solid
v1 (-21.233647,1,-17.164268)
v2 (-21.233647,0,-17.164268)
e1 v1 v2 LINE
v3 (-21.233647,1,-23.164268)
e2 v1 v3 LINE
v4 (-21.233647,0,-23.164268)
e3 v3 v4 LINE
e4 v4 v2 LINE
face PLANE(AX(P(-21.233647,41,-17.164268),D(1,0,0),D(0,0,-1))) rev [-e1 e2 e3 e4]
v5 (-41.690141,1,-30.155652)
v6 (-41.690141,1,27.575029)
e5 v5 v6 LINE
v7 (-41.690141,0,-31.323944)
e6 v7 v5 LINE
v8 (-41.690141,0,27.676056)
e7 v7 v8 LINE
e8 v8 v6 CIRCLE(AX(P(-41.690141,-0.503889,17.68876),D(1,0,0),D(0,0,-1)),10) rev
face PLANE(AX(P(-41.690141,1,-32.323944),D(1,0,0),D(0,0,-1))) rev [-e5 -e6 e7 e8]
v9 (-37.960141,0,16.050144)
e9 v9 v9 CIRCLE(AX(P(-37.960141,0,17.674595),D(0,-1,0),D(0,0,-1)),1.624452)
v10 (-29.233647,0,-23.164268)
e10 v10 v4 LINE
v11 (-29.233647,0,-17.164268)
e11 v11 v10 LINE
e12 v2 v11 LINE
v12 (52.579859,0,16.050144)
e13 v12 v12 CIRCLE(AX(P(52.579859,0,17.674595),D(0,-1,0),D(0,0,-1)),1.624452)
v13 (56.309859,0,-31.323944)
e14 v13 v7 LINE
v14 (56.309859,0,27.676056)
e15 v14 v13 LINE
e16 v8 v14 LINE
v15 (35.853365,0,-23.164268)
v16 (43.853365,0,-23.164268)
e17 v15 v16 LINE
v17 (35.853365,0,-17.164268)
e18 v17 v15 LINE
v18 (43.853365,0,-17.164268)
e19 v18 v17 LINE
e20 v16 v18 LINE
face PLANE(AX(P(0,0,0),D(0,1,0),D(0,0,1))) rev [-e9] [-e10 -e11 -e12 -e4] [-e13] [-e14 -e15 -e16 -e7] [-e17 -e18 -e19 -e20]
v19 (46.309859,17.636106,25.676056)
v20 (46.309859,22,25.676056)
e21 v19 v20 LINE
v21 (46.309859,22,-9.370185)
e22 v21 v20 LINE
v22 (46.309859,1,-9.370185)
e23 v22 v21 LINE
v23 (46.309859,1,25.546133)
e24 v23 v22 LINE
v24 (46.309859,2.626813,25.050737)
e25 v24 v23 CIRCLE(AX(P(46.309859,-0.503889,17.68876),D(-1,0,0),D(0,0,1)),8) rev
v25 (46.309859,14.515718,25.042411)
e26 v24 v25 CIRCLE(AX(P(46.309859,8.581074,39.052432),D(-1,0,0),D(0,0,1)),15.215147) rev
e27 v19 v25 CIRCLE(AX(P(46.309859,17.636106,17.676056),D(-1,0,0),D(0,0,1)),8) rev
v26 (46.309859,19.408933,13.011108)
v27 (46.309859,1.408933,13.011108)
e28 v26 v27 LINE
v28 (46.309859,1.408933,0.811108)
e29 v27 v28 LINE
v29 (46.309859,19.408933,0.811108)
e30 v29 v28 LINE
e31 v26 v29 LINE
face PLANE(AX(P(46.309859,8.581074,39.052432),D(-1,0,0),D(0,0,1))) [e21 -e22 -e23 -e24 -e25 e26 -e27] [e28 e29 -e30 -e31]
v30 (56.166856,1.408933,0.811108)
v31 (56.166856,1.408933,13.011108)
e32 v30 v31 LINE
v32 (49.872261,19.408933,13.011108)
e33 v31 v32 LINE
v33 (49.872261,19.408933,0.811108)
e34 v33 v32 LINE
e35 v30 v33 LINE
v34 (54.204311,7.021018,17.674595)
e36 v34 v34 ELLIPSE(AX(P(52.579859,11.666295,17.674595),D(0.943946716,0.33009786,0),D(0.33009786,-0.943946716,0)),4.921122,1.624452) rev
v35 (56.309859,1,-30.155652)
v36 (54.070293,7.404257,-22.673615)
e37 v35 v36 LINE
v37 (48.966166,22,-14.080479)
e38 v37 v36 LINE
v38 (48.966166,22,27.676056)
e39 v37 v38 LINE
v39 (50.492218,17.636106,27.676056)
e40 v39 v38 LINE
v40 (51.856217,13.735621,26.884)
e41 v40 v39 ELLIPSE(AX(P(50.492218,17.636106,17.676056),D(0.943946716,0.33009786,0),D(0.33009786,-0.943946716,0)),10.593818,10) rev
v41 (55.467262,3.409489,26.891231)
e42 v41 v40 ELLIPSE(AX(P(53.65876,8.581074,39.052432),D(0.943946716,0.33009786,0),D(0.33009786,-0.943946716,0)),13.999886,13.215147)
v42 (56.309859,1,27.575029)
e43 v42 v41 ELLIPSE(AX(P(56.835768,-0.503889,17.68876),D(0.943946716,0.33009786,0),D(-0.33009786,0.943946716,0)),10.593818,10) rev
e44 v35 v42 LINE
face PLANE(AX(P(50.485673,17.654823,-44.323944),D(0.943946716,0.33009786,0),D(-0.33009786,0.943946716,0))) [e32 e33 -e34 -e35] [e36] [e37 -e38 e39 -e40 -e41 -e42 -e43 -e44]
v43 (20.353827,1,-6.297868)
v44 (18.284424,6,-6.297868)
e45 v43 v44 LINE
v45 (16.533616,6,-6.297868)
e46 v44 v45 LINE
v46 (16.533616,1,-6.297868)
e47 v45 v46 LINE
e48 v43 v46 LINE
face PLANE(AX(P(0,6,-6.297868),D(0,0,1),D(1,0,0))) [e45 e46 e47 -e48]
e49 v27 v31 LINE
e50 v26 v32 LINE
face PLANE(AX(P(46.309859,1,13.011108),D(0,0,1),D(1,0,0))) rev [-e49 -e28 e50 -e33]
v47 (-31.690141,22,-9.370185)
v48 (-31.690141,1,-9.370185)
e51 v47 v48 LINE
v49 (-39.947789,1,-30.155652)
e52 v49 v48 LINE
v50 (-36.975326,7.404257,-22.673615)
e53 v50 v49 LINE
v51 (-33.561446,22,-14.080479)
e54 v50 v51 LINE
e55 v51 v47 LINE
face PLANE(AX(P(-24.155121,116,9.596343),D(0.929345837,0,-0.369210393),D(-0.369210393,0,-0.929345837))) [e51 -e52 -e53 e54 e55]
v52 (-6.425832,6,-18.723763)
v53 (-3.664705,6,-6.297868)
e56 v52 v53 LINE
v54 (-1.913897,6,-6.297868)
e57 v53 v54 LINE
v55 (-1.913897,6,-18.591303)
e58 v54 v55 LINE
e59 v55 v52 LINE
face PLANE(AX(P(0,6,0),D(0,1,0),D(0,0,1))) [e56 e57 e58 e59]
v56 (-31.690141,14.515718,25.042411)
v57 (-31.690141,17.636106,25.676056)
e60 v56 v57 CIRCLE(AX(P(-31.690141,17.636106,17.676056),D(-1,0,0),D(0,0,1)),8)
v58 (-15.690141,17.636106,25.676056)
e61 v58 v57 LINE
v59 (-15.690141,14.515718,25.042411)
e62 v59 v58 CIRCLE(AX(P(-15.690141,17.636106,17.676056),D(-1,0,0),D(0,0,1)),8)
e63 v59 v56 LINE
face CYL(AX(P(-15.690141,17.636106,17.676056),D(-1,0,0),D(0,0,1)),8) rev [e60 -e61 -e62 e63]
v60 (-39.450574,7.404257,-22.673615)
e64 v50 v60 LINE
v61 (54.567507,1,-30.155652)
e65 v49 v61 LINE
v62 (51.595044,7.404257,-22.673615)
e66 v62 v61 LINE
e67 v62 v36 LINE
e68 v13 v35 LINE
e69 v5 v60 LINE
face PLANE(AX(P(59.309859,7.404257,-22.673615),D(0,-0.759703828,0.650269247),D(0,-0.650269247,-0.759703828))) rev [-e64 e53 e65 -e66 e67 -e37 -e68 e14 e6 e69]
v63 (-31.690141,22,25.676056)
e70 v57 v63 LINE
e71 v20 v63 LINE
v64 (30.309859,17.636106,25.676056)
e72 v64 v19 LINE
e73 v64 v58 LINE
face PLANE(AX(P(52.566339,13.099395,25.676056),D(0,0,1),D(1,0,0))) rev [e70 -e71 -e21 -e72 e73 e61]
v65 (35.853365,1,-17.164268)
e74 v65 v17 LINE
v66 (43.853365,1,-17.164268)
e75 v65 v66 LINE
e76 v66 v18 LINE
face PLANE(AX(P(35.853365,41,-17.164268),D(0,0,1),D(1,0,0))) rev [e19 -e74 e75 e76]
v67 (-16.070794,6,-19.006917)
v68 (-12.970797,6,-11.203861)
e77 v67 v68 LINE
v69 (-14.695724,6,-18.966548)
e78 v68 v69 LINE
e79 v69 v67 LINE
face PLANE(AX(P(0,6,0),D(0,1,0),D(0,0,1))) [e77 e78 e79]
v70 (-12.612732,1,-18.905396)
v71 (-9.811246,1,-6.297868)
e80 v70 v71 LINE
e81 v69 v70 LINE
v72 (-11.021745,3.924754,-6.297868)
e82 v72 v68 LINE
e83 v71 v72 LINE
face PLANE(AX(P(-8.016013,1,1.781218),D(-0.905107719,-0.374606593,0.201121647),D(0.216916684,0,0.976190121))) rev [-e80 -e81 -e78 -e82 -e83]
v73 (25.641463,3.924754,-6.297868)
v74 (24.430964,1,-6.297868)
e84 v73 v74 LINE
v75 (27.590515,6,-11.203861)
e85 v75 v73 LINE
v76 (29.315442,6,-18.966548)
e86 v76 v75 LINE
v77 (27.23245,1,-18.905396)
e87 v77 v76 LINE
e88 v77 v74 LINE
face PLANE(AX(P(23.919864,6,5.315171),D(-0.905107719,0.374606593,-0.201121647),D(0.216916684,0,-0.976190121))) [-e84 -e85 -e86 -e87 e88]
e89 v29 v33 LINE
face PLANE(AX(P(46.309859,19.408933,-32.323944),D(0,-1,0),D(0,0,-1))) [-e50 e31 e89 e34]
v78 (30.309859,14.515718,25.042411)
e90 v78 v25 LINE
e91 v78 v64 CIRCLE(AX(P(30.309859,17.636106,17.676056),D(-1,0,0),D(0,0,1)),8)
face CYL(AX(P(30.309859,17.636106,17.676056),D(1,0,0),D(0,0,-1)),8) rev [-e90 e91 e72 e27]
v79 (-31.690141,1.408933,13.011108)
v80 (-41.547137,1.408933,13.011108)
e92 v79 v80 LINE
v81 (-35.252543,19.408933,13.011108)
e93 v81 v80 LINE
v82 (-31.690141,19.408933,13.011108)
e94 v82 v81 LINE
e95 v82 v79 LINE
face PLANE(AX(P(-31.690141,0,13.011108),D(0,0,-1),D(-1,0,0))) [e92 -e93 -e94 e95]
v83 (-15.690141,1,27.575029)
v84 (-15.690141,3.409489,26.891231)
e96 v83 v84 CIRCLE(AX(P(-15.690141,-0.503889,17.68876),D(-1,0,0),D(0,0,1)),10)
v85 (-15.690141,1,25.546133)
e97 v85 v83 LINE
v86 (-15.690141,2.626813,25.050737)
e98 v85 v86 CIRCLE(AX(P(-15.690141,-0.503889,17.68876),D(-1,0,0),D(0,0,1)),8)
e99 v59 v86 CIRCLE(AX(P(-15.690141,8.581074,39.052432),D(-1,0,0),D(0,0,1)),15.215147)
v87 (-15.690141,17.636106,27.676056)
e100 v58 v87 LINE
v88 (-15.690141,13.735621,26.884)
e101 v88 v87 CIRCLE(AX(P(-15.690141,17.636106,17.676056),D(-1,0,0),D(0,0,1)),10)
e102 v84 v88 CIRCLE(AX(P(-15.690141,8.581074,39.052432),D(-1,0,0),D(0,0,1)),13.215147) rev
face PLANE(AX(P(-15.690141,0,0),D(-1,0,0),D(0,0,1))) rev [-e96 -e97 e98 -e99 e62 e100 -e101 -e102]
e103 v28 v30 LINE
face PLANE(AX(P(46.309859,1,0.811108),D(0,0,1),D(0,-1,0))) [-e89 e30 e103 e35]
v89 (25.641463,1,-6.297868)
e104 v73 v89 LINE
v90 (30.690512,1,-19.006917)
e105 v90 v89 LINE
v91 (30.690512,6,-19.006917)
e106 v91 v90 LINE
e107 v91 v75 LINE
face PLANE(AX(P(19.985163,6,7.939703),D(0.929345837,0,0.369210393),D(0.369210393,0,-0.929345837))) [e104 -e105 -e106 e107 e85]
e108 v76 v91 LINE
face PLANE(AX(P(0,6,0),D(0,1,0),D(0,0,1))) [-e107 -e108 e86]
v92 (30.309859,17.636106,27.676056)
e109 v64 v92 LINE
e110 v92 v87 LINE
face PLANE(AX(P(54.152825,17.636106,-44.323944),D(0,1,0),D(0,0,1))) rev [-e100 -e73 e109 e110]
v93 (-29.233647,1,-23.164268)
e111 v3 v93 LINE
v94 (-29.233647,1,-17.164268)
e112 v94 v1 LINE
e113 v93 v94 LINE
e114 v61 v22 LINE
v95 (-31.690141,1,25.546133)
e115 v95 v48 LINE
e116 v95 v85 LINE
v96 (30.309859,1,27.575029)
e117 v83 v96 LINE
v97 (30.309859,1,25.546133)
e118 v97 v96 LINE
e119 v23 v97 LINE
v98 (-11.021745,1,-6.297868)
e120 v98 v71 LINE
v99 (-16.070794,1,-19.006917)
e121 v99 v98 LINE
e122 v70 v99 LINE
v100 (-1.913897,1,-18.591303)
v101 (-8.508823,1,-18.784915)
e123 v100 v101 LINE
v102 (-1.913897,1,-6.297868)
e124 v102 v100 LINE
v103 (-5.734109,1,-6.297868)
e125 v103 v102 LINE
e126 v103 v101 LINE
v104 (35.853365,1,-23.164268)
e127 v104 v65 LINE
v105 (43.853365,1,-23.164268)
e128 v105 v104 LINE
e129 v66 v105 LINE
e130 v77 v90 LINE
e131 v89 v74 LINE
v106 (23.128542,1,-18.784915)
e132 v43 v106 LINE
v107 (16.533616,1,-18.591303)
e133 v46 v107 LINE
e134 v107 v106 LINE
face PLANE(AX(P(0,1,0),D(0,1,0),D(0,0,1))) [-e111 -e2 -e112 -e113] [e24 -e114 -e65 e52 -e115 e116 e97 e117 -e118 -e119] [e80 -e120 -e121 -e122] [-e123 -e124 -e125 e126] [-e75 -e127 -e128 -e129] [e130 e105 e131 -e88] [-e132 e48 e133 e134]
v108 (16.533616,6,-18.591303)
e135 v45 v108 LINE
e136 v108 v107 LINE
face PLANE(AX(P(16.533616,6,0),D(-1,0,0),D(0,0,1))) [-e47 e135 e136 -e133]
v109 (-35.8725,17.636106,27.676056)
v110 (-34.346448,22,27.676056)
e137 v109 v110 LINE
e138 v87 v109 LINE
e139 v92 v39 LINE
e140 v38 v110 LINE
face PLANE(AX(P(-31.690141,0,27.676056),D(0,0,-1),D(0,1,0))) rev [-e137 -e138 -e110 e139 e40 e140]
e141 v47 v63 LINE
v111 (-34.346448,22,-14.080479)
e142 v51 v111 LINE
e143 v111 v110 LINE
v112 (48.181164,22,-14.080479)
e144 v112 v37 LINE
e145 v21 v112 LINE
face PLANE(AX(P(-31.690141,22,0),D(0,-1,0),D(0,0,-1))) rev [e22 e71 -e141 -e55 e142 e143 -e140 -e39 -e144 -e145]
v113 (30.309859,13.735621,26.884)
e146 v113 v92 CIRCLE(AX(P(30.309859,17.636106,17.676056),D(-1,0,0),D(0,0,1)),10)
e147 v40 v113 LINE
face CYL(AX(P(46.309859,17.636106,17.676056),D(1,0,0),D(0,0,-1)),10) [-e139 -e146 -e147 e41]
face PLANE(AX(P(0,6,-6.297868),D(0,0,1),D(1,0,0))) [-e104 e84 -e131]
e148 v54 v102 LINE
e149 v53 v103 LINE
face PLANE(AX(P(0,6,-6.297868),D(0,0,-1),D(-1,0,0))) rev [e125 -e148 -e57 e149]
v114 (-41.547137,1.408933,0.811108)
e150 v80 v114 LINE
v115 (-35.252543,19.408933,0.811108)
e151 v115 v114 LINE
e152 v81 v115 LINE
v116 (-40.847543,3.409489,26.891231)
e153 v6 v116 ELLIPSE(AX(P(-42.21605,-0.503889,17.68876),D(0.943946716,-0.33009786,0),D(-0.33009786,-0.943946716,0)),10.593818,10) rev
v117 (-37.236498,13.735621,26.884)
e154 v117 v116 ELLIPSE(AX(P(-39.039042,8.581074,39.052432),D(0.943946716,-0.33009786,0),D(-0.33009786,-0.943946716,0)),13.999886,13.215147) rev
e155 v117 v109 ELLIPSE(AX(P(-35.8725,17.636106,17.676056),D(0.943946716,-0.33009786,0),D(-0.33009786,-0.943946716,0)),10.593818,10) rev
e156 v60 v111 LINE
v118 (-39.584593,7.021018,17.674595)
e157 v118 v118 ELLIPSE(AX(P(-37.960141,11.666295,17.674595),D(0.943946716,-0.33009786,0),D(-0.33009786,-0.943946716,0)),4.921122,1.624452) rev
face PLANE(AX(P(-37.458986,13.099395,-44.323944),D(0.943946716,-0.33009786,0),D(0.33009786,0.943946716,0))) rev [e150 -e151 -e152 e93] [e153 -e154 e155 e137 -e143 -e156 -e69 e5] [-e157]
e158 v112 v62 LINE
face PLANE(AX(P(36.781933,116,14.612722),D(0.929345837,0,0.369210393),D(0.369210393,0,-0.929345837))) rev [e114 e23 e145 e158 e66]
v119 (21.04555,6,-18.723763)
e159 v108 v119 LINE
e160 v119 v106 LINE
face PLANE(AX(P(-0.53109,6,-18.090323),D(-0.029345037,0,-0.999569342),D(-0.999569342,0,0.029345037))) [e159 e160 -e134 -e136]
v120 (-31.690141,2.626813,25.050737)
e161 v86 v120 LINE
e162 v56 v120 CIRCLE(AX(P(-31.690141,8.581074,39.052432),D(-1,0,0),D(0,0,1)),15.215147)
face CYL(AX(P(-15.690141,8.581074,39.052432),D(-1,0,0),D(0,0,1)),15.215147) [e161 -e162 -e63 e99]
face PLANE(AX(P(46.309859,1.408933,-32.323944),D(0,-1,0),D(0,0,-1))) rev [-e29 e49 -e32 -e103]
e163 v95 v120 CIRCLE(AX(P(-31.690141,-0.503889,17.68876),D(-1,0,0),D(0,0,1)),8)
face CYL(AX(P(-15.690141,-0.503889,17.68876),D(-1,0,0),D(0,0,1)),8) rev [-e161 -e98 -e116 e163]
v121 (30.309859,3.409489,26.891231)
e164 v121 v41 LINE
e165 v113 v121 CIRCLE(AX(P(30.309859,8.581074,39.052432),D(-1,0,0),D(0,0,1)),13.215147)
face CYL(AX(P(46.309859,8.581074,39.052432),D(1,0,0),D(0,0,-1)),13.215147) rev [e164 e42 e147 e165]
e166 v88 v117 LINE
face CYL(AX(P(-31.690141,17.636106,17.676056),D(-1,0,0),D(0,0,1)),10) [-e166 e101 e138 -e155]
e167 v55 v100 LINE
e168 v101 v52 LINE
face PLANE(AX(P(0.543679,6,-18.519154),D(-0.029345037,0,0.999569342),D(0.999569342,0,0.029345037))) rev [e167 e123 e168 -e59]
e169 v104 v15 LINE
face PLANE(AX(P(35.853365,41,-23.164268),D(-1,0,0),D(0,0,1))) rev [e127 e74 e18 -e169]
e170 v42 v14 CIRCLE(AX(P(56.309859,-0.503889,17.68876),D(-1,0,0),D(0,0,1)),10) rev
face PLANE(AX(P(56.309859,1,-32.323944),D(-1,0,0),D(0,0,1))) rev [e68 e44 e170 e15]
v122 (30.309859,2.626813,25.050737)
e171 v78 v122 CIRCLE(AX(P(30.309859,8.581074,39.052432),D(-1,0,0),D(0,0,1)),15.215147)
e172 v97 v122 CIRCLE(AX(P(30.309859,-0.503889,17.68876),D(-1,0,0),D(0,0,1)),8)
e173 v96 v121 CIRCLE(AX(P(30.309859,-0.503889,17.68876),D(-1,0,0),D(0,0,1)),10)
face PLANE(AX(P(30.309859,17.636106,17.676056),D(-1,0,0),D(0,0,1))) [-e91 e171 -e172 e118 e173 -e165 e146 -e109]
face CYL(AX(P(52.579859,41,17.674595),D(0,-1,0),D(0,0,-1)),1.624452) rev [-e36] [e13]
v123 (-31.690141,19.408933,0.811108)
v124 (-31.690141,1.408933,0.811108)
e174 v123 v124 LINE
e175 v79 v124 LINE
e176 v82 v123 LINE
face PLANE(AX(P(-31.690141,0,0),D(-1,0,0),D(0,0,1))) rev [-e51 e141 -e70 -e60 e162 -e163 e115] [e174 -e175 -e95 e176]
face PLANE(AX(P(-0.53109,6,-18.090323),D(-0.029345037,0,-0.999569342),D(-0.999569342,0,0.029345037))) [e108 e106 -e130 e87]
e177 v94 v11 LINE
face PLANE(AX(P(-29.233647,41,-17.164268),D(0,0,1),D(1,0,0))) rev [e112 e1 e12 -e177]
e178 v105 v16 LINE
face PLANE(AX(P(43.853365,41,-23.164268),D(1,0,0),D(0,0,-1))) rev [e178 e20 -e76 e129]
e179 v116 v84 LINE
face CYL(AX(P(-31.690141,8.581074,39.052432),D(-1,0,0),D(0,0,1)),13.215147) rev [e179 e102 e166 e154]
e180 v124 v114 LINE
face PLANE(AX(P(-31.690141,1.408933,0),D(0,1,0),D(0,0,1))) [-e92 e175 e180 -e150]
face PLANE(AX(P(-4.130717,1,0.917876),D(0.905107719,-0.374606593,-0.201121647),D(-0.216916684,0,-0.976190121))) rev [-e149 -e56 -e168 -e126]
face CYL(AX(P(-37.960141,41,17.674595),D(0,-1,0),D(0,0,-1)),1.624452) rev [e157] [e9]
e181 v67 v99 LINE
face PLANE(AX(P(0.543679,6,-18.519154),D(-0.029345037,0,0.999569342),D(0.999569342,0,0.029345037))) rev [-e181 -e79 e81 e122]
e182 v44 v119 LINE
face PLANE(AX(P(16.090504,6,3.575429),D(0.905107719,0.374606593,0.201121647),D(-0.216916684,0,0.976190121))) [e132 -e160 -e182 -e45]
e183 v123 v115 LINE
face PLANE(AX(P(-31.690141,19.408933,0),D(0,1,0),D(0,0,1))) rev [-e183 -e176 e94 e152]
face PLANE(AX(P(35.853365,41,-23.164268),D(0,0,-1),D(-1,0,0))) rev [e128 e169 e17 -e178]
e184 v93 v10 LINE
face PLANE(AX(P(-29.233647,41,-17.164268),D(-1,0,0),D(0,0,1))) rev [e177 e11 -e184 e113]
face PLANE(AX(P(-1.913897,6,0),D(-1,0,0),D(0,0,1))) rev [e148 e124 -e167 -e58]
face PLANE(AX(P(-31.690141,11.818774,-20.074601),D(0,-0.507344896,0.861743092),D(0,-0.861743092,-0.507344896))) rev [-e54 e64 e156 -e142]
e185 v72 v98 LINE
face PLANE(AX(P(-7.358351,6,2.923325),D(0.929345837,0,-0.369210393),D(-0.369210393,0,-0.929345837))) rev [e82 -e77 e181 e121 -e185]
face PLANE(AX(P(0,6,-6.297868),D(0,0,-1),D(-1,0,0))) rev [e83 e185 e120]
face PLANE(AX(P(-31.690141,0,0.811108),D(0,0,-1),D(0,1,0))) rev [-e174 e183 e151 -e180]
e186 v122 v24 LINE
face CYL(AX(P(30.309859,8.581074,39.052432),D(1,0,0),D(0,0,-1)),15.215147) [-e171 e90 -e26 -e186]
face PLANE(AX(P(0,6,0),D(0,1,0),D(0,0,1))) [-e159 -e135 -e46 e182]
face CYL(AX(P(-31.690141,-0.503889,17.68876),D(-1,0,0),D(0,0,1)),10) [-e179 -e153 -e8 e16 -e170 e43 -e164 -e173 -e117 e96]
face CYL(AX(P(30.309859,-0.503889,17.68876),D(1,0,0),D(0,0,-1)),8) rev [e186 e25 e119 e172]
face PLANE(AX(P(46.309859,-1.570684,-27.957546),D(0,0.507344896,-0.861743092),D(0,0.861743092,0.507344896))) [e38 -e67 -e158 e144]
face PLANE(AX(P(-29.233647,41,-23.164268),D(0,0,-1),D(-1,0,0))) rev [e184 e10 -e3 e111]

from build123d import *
from OCP.BRepFilletAPI import BRepFilletAPI_MakeChamfer
from build123d.topology import SkipClean

# Parameters (mm, degrees)
CROQUIS1_W              = 98
CROQUIS1_H              = 60
SALIENTE_EXTRUIR1_DEPTH = 1
CROQUIS2_W              = 12.2
CROQUIS2_H              = 18
SALIENTE_EXTRUIR2_DEPTH = 10
SALIENTE_EXTRUIR3_START = -88
CROQUIS2_3_W            = 12.2
CROQUIS2_3_H            = 18
SALIENTE_EXTRUIR3_DEPTH = 10
CORTAR_EXTRUIR1_DEPTH   = 115
CORTAR_EXTRUIR2_DEPTH   = 115
REDONDEO1_R             = 10
REDONDEO2_START         = -43
REDONDEO2_DEPTH         = 100
CROQUIS4_R              = 1.624451876
CROQUIS4_W              = 8
CROQUIS4_H              = 6
CORTAR_EXTRUIR3_DEPTH   = 41
SALIENTE_EXTRUIR4_DEPTH = 5
CHAFL_N1_SIZE           = 5
CHAFL_N1_SIZE_2         = 2.020131129
CORTAR_EXTRUIR4_DEPTH   = 101
SALIENTE_EXTRUIR5_DEPTH = 26
SALIENTE_EXTRUIR6_START = -72
SALIENTE_EXTRUIR6_DEPTH = 26
CORTAR_EXTRUIR5_DEPTH   = 72
SALIENTE_EXTRUIR7_START = -88
CROQUIS7_5_W            = 2
CROQUIS7_5_H            = 4.363894299
SALIENTE_EXTRUIR7_DEPTH = 78


with BuildPart() as part:
    # Croquis1 → Saliente-Extruir1 (new body)
    with BuildSketch(Plane(origin=(0, 0, 0), x_dir=(1, 0, 0), z_dir=(0, 1, 0))):
        with Locations((7.309859155, 2.323943662)):
            Rectangle(CROQUIS1_W, CROQUIS1_H)
    extrude(amount=SALIENTE_EXTRUIR1_DEPTH)

    # Croquis2 → Saliente-Extruir2 (add)
    with BuildSketch(Plane.ZY.offset(41.690140845)):
        with BuildLine():
            Line((-22.673615367, 7.404257104), (-31.02059504, 1))
            Line((-31.02059504, 1), (27.676056338, 1))
            Line((27.676056338, 1), (27.676056338, 1.85662729))
            ThreePointArc((27.676056338, 1.85662729), (25.837285222, 8.581073785), (27.676056338, 15.305520281))
            Line((27.676056338, 15.305520281), (27.676056338, 22))
            Line((27.676056338, 22), (-14.080479284, 22))
            Line((-14.080479284, 22), (-22.673615367, 7.404257104))
        make_face()
        with Locations((6.911108061, 10.408932756)):
            Rectangle(CROQUIS2_W, CROQUIS2_H, mode=Mode.SUBTRACT)
    extrude(amount=-SALIENTE_EXTRUIR2_DEPTH)

    # Croquis2<3> → Saliente-Extruir3 (add)
    with BuildSketch(Plane.ZY.offset(41.690140845).offset(SALIENTE_EXTRUIR3_START)):
        with BuildLine():
            Line((-22.673615367, 7.404257104), (-31.02059504, 1))
            Line((-31.02059504, 1), (27.676056338, 1))
            Line((27.676056338, 1), (27.676056338, 1.85662729))
            ThreePointArc((27.676056338, 1.85662729), (25.837285222, 8.581073785), (27.676056338, 15.305520281))
            Line((27.676056338, 15.305520281), (27.676056338, 22))
            Line((27.676056338, 22), (-14.080479284, 22))
            Line((-14.080479284, 22), (-22.673615367, 7.404257104))
        make_face()
        with Locations((6.911108061, 10.408932756)):
            Rectangle(CROQUIS2_3_W, CROQUIS2_3_H, mode=Mode.SUBTRACT)
    extrude(amount=-SALIENTE_EXTRUIR3_DEPTH)

    # Croquis2<4> → Cortar-Extruir1 (cut)
    with BuildSketch(Plane.ZY.offset(41.690140845)):
        Polygon((-32.323943662, 1), (-32.323943662, 0), (-31.02059504, 1), align=None)
    extrude(amount=-CORTAR_EXTRUIR1_DEPTH, mode=Mode.SUBTRACT)

    # Croquis3 → Cortar-Extruir2 (cut)
    with BuildSketch(Plane(origin=(0, 1, 0), x_dir=(1, 0, 0), z_dir=(0, 1, 0))):
        Polygon((-40.291413083, 31.02059504), (-31.690140845, 9.370184618), (-31.690140845, 31.02059504), align=None)
        Polygon((54.911131393, 31.02059504), (46.309859155, 31.02059504), (46.309859155, 9.370184618), align=None)
    extrude(amount=CORTAR_EXTRUIR2_DEPTH, mode=Mode.SUBTRACT)

    # Redondeo1
    # the kernel refuses this fillet: 10 mm, written as the material it takes off along each edge
    # the kernel refuses this fillet: 10 mm, written as the material it takes off along each edge
    with BuildSketch(Plane(origin=(-46.33170907, 1.85662729, 27.676056338), x_dir=(0, 0.8924889538837264, -0.4510692487806408), z_dir=(1, 0, 0))) as redondeo1_2_piece_1:
        with BuildLine():
            CenterArc((2.398228131, -9.978308132), REDONDEO1_R, 93.774545272, 20.149469447)
            Line((-1.657019348, -0.837467477), (0, 0))
            ThreePointArc((0, 0), (0.869961056, -0.028666121), (1.739922113, 0))
        make_face()
    extrude(amount=19.283136451, mode=Mode.SUBTRACT)
    # the kernel refuses this fillet: 10 mm, written as the material it takes off along each edge
    # the kernel refuses this fillet: 10 mm, written as the material it takes off along each edge
    with BuildSketch(Plane(origin=(41.66829093, 1.85662729, 27.676056338), x_dir=(0, -1, 0), z_dir=(1, 0, 0))) as redondeo1_4_piece_1:
        with BuildLine():
            CenterArc((2.360515838, 9.987296748), REDONDEO1_R, 246.962238713, 20.149469447)
            ThreePointArc((-1.552861266, 0.78482536), (-0.763500227, 0.417996876), (0, 0))
            Line((0, 0), (1.85662729, 0))
        make_face()
    extrude(amount=19.283136451, mode=Mode.SUBTRACT)
    # the kernel refuses this fillet: 10 mm, written as the material it takes off along each edge
    with BuildSketch(Plane(origin=(52.565538288, 1, 27.676056338), x_dir=(0, -1, 0), z_dir=(-1, 0, 0))) as redondeo1_5_piece_1_section:
        with BuildLine():
            CenterArc((10, -4.358898944), REDONDEO1_R, 154.158067237, 25.841932763)
            Line((0, -4.358898944), (0, 0))
            Line((0, 0), (1, 0))
        make_face()
    redondeo1_5_piece_1 = extrude(amount=90.511358267, mode=Mode.PRIVATE)
    redondeo1_5_piece_1 = redondeo1_5_piece_1 - Plane(origin=(52.565538288, -0.503888548, 17.68875959), x_dir=(0, 0.050388854784132256, 0.998729674793707), z_dir=(-1, 0, 0)) * Cylinder(10, 199, mode=Mode.PRIVATE)
    add(redondeo1_5_piece_1, mode=Mode.SUBTRACT)

    # Redondeo2: read off the stored shape, not the designer's step
    # Redondeo2 outline → Redondeo2 (cut)
    with SkipClean():  # the faces are left unmerged after this step: merging them gives an invalid solid
        with BuildSketch(Plane.YZ.offset(REDONDEO2_START)):
            with BuildLine():
                ThreePointArc((13.735621222, 26.883999693), (15.646059665, 27.476041888), (17.636105701, 27.676056338))
                Line((17.636105701, 27.676056338), (15.305520281, 27.676056338))
                ThreePointArc((15.305520281, 27.676056338), (14.533759116, 27.253887965), (13.735621222, 26.883999693))
            make_face()
        extrude(amount=REDONDEO2_DEPTH, mode=Mode.SUBTRACT)
    add(part.part.scale(1), mode=Mode.REPLACE)  # the faces are merged on a copy

    # Croquis4 → Cortar-Extruir3 (cut)
    with BuildSketch(Plane.XZ):
        with Locations(Location((-37.960140845, 17.674595399, 0), (0, 0, 270))):
            Circle(CROQUIS4_R)
        with Locations(Location((52.579859155, 17.674595399, 0), (0, 0, 270))):
            Circle(CROQUIS4_R)
        with Locations((-25.233647173, -20.164268386)):
            Rectangle(CROQUIS4_W, CROQUIS4_H)
        with Locations((39.853365482, -20.164268386)):
            Rectangle(CROQUIS4_W, CROQUIS4_H)
    extrude(amount=-CORTAR_EXTRUIR3_DEPTH, mode=Mode.SUBTRACT)

    # Croquis5 → Saliente-Extruir4 (add)
    with BuildSketch(Plane(origin=(0, 1, 0), x_dir=(1, 0, 0), z_dir=(0, 1, 0))):
        Polygon((-1.913897366, 6.29786762), (-1.913897366, 18.591303013), (-8.5088233, 18.784914739), (-5.73410883, 6.29786762), align=None)
        Polygon((-9.811245677, 6.29786762), (-12.612731972, 18.905395977), (-16.070794085, 19.006916659), (-11.021744735, 6.29786762), align=None)
        Polygon((16.533615676, 18.591303013), (16.533615676, 6.29786762), (20.35382714, 6.29786762), (23.12854161, 18.784914739), align=None)
        Polygon((27.232450282, 18.905395977), (24.430963987, 6.29786762), (25.641463045, 6.29786762), (30.690512395, 19.006916659), align=None)
    extrude(amount=SALIENTE_EXTRUIR4_DEPTH)

    # Chaflán1
    chafl_n1_edges_1 = [part.edges().sort_by_distance(p)[0] for p in [
        (25.831707134, 6, -12.601631799),
    ]]
    chafl_n1_side_1 = [part.faces().sort_by_distance(p)[0] for p in [
        (25.831707134, 5.959597377, -12.601631799),
    ]]
    chafl_n1_edges_2 = [part.edges().sort_by_distance(p)[0] for p in [
        (21.741184375, 6, -12.541391179),
    ]]
    chafl_n1_side_2 = [part.faces().sort_by_distance(p)[0] for p in [
        (21.741184375, 5.959597377, -12.541391179),
    ]]
    chafl_n1_edges_3 = [part.edges().sort_by_distance(p)[0] for p in [
        (-11.211988825, 6, -12.601631799),
    ]]
    chafl_n1_side_3 = [part.faces().sort_by_distance(p)[0] for p in [
        (-11.211988825, 5.959597377, -12.601631799),
    ]]
    chafl_n1_edges_4 = [part.edges().sort_by_distance(p)[0] for p in [
        (-7.121466065, 6, -12.541391179),
    ]]
    chafl_n1_side_4 = [part.faces().sort_by_distance(p)[0] for p in [
        (-7.121466065, 5.959597377, -12.541391179),
    ]]
    chafl_n1 = BRepFilletAPI_MakeChamfer(part.part.solid().wrapped)
    for e in chafl_n1_edges_1:
        chafl_n1.Add(CHAFL_N1_SIZE - 0.0001, CHAFL_N1_SIZE_2 - 0.0001, e.wrapped, chafl_n1_side_1[0].wrapped)
    for e in chafl_n1_edges_2:
        chafl_n1.Add(CHAFL_N1_SIZE - 0.0001, CHAFL_N1_SIZE_2 - 0.0001, e.wrapped, chafl_n1_side_2[0].wrapped)
    for e in chafl_n1_edges_3:
        chafl_n1.Add(CHAFL_N1_SIZE - 0.0001, CHAFL_N1_SIZE_2 - 0.0001, e.wrapped, chafl_n1_side_3[0].wrapped)
    for e in chafl_n1_edges_4:
        chafl_n1.Add(CHAFL_N1_SIZE - 0.0001, CHAFL_N1_SIZE_2 - 0.0001, e.wrapped, chafl_n1_side_4[0].wrapped)
    add(Compound.cast(chafl_n1.Shape()), mode=Mode.REPLACE)  # a hair under: the kernel refuses the full size

    # Croquis6 → Cortar-Extruir4 (cut)
    with BuildSketch(Plane.ZY.offset(41.690140845)):
        Polygon((-22.673615367, 7.404257104), (-31.323943662, 0), (-32.323943662, 0), align=None)
    extrude(amount=-CORTAR_EXTRUIR4_DEPTH, mode=Mode.SUBTRACT)

    # Croquis7 → Saliente-Extruir5 (add)
    with BuildSketch(Plane.ZY.offset(41.690140845)):
        with BuildLine():
            Line((27.676056338, 17.636105701), (25.676056338, 17.636105701))
            ThreePointArc((25.676056338, 17.636105701), (25.516044778, 16.044068872), (25.042411022, 14.515718118))
            ThreePointArc((25.042411022, 14.515718118), (23.837288952, 8.570418777), (25.0507367, 2.626813135))
            ThreePointArc((25.0507367, 2.626813135), (25.473403095, 1.339837436), (25.67287484, 0))
            Line((25.67287484, 0), (27.676056338, 0))
            ThreePointArc((27.676056338, 0), (27.433909837, 1.739333838), (26.891230978, 3.409488556))
            ThreePointArc((26.891230978, 3.409488556), (25.837288462, 8.571819356), (26.883999693, 13.735621222))
            ThreePointArc((26.883999693, 13.735621222), (27.476041888, 15.646059665), (27.676056338, 17.636105701))
        make_face()
    extrude(amount=-SALIENTE_EXTRUIR5_DEPTH)

    # Croquis7<4> → Saliente-Extruir6 (add)
    with BuildSketch(Plane.ZY.offset(41.690140845).offset(SALIENTE_EXTRUIR6_START)):
        with BuildLine():
            Line((27.676056338, 17.636105701), (25.676056338, 17.636105701))
            ThreePointArc((25.676056338, 17.636105701), (25.516044778, 16.044068872), (25.042411022, 14.515718118))
            ThreePointArc((25.042411022, 14.515718118), (23.837288952, 8.570418777), (25.0507367, 2.626813135))
            ThreePointArc((25.0507367, 2.626813135), (25.473403095, 1.339837436), (25.67287484, 0))
            Line((25.67287484, 0), (27.676056338, 0))
            ThreePointArc((27.676056338, 0), (27.433909837, 1.739333838), (26.891230978, 3.409488556))
            ThreePointArc((26.891230978, 3.409488556), (25.837288462, 8.571819356), (26.883999693, 13.735621222))
            ThreePointArc((26.883999693, 13.735621222), (27.476041888, 15.646059665), (27.676056338, 17.636105701))
        make_face()
    extrude(amount=-SALIENTE_EXTRUIR6_DEPTH)

    # Croquis8 → Cortar-Extruir5 (cut)
    with BuildSketch(Plane.XY.offset(27.676056338)):
        Polygon((-43.181006637, 23.333071417), (-41.690140845, 1), (-35.872500086, 17.636105701), (-41.690140845, 17.636105701), (-41.690140845, 22), (-34.346447667, 22), align=None)
        Polygon((-41.690140845, 17.636105701), (-35.872500086, 17.636105701), (-34.346447667, 22), (-41.690140845, 22), align=None)
        Polygon((57.800724947, 23.333071417), (56.309859155, 1), (48.966165977, 22), align=None)
    extrude(amount=-CORTAR_EXTRUIR5_DEPTH, mode=Mode.SUBTRACT)

    # Croquis7<5> → Saliente-Extruir7 (add)
    with BuildSketch(Plane.ZY.offset(41.690140845).offset(SALIENTE_EXTRUIR7_START)):
        with Locations((26.676056338, 19.818052851)):
            Rectangle(CROQUIS7_5_W, CROQUIS7_5_H)
    extrude(amount=SALIENTE_EXTRUIR7_DEPTH)


solid = part.part
